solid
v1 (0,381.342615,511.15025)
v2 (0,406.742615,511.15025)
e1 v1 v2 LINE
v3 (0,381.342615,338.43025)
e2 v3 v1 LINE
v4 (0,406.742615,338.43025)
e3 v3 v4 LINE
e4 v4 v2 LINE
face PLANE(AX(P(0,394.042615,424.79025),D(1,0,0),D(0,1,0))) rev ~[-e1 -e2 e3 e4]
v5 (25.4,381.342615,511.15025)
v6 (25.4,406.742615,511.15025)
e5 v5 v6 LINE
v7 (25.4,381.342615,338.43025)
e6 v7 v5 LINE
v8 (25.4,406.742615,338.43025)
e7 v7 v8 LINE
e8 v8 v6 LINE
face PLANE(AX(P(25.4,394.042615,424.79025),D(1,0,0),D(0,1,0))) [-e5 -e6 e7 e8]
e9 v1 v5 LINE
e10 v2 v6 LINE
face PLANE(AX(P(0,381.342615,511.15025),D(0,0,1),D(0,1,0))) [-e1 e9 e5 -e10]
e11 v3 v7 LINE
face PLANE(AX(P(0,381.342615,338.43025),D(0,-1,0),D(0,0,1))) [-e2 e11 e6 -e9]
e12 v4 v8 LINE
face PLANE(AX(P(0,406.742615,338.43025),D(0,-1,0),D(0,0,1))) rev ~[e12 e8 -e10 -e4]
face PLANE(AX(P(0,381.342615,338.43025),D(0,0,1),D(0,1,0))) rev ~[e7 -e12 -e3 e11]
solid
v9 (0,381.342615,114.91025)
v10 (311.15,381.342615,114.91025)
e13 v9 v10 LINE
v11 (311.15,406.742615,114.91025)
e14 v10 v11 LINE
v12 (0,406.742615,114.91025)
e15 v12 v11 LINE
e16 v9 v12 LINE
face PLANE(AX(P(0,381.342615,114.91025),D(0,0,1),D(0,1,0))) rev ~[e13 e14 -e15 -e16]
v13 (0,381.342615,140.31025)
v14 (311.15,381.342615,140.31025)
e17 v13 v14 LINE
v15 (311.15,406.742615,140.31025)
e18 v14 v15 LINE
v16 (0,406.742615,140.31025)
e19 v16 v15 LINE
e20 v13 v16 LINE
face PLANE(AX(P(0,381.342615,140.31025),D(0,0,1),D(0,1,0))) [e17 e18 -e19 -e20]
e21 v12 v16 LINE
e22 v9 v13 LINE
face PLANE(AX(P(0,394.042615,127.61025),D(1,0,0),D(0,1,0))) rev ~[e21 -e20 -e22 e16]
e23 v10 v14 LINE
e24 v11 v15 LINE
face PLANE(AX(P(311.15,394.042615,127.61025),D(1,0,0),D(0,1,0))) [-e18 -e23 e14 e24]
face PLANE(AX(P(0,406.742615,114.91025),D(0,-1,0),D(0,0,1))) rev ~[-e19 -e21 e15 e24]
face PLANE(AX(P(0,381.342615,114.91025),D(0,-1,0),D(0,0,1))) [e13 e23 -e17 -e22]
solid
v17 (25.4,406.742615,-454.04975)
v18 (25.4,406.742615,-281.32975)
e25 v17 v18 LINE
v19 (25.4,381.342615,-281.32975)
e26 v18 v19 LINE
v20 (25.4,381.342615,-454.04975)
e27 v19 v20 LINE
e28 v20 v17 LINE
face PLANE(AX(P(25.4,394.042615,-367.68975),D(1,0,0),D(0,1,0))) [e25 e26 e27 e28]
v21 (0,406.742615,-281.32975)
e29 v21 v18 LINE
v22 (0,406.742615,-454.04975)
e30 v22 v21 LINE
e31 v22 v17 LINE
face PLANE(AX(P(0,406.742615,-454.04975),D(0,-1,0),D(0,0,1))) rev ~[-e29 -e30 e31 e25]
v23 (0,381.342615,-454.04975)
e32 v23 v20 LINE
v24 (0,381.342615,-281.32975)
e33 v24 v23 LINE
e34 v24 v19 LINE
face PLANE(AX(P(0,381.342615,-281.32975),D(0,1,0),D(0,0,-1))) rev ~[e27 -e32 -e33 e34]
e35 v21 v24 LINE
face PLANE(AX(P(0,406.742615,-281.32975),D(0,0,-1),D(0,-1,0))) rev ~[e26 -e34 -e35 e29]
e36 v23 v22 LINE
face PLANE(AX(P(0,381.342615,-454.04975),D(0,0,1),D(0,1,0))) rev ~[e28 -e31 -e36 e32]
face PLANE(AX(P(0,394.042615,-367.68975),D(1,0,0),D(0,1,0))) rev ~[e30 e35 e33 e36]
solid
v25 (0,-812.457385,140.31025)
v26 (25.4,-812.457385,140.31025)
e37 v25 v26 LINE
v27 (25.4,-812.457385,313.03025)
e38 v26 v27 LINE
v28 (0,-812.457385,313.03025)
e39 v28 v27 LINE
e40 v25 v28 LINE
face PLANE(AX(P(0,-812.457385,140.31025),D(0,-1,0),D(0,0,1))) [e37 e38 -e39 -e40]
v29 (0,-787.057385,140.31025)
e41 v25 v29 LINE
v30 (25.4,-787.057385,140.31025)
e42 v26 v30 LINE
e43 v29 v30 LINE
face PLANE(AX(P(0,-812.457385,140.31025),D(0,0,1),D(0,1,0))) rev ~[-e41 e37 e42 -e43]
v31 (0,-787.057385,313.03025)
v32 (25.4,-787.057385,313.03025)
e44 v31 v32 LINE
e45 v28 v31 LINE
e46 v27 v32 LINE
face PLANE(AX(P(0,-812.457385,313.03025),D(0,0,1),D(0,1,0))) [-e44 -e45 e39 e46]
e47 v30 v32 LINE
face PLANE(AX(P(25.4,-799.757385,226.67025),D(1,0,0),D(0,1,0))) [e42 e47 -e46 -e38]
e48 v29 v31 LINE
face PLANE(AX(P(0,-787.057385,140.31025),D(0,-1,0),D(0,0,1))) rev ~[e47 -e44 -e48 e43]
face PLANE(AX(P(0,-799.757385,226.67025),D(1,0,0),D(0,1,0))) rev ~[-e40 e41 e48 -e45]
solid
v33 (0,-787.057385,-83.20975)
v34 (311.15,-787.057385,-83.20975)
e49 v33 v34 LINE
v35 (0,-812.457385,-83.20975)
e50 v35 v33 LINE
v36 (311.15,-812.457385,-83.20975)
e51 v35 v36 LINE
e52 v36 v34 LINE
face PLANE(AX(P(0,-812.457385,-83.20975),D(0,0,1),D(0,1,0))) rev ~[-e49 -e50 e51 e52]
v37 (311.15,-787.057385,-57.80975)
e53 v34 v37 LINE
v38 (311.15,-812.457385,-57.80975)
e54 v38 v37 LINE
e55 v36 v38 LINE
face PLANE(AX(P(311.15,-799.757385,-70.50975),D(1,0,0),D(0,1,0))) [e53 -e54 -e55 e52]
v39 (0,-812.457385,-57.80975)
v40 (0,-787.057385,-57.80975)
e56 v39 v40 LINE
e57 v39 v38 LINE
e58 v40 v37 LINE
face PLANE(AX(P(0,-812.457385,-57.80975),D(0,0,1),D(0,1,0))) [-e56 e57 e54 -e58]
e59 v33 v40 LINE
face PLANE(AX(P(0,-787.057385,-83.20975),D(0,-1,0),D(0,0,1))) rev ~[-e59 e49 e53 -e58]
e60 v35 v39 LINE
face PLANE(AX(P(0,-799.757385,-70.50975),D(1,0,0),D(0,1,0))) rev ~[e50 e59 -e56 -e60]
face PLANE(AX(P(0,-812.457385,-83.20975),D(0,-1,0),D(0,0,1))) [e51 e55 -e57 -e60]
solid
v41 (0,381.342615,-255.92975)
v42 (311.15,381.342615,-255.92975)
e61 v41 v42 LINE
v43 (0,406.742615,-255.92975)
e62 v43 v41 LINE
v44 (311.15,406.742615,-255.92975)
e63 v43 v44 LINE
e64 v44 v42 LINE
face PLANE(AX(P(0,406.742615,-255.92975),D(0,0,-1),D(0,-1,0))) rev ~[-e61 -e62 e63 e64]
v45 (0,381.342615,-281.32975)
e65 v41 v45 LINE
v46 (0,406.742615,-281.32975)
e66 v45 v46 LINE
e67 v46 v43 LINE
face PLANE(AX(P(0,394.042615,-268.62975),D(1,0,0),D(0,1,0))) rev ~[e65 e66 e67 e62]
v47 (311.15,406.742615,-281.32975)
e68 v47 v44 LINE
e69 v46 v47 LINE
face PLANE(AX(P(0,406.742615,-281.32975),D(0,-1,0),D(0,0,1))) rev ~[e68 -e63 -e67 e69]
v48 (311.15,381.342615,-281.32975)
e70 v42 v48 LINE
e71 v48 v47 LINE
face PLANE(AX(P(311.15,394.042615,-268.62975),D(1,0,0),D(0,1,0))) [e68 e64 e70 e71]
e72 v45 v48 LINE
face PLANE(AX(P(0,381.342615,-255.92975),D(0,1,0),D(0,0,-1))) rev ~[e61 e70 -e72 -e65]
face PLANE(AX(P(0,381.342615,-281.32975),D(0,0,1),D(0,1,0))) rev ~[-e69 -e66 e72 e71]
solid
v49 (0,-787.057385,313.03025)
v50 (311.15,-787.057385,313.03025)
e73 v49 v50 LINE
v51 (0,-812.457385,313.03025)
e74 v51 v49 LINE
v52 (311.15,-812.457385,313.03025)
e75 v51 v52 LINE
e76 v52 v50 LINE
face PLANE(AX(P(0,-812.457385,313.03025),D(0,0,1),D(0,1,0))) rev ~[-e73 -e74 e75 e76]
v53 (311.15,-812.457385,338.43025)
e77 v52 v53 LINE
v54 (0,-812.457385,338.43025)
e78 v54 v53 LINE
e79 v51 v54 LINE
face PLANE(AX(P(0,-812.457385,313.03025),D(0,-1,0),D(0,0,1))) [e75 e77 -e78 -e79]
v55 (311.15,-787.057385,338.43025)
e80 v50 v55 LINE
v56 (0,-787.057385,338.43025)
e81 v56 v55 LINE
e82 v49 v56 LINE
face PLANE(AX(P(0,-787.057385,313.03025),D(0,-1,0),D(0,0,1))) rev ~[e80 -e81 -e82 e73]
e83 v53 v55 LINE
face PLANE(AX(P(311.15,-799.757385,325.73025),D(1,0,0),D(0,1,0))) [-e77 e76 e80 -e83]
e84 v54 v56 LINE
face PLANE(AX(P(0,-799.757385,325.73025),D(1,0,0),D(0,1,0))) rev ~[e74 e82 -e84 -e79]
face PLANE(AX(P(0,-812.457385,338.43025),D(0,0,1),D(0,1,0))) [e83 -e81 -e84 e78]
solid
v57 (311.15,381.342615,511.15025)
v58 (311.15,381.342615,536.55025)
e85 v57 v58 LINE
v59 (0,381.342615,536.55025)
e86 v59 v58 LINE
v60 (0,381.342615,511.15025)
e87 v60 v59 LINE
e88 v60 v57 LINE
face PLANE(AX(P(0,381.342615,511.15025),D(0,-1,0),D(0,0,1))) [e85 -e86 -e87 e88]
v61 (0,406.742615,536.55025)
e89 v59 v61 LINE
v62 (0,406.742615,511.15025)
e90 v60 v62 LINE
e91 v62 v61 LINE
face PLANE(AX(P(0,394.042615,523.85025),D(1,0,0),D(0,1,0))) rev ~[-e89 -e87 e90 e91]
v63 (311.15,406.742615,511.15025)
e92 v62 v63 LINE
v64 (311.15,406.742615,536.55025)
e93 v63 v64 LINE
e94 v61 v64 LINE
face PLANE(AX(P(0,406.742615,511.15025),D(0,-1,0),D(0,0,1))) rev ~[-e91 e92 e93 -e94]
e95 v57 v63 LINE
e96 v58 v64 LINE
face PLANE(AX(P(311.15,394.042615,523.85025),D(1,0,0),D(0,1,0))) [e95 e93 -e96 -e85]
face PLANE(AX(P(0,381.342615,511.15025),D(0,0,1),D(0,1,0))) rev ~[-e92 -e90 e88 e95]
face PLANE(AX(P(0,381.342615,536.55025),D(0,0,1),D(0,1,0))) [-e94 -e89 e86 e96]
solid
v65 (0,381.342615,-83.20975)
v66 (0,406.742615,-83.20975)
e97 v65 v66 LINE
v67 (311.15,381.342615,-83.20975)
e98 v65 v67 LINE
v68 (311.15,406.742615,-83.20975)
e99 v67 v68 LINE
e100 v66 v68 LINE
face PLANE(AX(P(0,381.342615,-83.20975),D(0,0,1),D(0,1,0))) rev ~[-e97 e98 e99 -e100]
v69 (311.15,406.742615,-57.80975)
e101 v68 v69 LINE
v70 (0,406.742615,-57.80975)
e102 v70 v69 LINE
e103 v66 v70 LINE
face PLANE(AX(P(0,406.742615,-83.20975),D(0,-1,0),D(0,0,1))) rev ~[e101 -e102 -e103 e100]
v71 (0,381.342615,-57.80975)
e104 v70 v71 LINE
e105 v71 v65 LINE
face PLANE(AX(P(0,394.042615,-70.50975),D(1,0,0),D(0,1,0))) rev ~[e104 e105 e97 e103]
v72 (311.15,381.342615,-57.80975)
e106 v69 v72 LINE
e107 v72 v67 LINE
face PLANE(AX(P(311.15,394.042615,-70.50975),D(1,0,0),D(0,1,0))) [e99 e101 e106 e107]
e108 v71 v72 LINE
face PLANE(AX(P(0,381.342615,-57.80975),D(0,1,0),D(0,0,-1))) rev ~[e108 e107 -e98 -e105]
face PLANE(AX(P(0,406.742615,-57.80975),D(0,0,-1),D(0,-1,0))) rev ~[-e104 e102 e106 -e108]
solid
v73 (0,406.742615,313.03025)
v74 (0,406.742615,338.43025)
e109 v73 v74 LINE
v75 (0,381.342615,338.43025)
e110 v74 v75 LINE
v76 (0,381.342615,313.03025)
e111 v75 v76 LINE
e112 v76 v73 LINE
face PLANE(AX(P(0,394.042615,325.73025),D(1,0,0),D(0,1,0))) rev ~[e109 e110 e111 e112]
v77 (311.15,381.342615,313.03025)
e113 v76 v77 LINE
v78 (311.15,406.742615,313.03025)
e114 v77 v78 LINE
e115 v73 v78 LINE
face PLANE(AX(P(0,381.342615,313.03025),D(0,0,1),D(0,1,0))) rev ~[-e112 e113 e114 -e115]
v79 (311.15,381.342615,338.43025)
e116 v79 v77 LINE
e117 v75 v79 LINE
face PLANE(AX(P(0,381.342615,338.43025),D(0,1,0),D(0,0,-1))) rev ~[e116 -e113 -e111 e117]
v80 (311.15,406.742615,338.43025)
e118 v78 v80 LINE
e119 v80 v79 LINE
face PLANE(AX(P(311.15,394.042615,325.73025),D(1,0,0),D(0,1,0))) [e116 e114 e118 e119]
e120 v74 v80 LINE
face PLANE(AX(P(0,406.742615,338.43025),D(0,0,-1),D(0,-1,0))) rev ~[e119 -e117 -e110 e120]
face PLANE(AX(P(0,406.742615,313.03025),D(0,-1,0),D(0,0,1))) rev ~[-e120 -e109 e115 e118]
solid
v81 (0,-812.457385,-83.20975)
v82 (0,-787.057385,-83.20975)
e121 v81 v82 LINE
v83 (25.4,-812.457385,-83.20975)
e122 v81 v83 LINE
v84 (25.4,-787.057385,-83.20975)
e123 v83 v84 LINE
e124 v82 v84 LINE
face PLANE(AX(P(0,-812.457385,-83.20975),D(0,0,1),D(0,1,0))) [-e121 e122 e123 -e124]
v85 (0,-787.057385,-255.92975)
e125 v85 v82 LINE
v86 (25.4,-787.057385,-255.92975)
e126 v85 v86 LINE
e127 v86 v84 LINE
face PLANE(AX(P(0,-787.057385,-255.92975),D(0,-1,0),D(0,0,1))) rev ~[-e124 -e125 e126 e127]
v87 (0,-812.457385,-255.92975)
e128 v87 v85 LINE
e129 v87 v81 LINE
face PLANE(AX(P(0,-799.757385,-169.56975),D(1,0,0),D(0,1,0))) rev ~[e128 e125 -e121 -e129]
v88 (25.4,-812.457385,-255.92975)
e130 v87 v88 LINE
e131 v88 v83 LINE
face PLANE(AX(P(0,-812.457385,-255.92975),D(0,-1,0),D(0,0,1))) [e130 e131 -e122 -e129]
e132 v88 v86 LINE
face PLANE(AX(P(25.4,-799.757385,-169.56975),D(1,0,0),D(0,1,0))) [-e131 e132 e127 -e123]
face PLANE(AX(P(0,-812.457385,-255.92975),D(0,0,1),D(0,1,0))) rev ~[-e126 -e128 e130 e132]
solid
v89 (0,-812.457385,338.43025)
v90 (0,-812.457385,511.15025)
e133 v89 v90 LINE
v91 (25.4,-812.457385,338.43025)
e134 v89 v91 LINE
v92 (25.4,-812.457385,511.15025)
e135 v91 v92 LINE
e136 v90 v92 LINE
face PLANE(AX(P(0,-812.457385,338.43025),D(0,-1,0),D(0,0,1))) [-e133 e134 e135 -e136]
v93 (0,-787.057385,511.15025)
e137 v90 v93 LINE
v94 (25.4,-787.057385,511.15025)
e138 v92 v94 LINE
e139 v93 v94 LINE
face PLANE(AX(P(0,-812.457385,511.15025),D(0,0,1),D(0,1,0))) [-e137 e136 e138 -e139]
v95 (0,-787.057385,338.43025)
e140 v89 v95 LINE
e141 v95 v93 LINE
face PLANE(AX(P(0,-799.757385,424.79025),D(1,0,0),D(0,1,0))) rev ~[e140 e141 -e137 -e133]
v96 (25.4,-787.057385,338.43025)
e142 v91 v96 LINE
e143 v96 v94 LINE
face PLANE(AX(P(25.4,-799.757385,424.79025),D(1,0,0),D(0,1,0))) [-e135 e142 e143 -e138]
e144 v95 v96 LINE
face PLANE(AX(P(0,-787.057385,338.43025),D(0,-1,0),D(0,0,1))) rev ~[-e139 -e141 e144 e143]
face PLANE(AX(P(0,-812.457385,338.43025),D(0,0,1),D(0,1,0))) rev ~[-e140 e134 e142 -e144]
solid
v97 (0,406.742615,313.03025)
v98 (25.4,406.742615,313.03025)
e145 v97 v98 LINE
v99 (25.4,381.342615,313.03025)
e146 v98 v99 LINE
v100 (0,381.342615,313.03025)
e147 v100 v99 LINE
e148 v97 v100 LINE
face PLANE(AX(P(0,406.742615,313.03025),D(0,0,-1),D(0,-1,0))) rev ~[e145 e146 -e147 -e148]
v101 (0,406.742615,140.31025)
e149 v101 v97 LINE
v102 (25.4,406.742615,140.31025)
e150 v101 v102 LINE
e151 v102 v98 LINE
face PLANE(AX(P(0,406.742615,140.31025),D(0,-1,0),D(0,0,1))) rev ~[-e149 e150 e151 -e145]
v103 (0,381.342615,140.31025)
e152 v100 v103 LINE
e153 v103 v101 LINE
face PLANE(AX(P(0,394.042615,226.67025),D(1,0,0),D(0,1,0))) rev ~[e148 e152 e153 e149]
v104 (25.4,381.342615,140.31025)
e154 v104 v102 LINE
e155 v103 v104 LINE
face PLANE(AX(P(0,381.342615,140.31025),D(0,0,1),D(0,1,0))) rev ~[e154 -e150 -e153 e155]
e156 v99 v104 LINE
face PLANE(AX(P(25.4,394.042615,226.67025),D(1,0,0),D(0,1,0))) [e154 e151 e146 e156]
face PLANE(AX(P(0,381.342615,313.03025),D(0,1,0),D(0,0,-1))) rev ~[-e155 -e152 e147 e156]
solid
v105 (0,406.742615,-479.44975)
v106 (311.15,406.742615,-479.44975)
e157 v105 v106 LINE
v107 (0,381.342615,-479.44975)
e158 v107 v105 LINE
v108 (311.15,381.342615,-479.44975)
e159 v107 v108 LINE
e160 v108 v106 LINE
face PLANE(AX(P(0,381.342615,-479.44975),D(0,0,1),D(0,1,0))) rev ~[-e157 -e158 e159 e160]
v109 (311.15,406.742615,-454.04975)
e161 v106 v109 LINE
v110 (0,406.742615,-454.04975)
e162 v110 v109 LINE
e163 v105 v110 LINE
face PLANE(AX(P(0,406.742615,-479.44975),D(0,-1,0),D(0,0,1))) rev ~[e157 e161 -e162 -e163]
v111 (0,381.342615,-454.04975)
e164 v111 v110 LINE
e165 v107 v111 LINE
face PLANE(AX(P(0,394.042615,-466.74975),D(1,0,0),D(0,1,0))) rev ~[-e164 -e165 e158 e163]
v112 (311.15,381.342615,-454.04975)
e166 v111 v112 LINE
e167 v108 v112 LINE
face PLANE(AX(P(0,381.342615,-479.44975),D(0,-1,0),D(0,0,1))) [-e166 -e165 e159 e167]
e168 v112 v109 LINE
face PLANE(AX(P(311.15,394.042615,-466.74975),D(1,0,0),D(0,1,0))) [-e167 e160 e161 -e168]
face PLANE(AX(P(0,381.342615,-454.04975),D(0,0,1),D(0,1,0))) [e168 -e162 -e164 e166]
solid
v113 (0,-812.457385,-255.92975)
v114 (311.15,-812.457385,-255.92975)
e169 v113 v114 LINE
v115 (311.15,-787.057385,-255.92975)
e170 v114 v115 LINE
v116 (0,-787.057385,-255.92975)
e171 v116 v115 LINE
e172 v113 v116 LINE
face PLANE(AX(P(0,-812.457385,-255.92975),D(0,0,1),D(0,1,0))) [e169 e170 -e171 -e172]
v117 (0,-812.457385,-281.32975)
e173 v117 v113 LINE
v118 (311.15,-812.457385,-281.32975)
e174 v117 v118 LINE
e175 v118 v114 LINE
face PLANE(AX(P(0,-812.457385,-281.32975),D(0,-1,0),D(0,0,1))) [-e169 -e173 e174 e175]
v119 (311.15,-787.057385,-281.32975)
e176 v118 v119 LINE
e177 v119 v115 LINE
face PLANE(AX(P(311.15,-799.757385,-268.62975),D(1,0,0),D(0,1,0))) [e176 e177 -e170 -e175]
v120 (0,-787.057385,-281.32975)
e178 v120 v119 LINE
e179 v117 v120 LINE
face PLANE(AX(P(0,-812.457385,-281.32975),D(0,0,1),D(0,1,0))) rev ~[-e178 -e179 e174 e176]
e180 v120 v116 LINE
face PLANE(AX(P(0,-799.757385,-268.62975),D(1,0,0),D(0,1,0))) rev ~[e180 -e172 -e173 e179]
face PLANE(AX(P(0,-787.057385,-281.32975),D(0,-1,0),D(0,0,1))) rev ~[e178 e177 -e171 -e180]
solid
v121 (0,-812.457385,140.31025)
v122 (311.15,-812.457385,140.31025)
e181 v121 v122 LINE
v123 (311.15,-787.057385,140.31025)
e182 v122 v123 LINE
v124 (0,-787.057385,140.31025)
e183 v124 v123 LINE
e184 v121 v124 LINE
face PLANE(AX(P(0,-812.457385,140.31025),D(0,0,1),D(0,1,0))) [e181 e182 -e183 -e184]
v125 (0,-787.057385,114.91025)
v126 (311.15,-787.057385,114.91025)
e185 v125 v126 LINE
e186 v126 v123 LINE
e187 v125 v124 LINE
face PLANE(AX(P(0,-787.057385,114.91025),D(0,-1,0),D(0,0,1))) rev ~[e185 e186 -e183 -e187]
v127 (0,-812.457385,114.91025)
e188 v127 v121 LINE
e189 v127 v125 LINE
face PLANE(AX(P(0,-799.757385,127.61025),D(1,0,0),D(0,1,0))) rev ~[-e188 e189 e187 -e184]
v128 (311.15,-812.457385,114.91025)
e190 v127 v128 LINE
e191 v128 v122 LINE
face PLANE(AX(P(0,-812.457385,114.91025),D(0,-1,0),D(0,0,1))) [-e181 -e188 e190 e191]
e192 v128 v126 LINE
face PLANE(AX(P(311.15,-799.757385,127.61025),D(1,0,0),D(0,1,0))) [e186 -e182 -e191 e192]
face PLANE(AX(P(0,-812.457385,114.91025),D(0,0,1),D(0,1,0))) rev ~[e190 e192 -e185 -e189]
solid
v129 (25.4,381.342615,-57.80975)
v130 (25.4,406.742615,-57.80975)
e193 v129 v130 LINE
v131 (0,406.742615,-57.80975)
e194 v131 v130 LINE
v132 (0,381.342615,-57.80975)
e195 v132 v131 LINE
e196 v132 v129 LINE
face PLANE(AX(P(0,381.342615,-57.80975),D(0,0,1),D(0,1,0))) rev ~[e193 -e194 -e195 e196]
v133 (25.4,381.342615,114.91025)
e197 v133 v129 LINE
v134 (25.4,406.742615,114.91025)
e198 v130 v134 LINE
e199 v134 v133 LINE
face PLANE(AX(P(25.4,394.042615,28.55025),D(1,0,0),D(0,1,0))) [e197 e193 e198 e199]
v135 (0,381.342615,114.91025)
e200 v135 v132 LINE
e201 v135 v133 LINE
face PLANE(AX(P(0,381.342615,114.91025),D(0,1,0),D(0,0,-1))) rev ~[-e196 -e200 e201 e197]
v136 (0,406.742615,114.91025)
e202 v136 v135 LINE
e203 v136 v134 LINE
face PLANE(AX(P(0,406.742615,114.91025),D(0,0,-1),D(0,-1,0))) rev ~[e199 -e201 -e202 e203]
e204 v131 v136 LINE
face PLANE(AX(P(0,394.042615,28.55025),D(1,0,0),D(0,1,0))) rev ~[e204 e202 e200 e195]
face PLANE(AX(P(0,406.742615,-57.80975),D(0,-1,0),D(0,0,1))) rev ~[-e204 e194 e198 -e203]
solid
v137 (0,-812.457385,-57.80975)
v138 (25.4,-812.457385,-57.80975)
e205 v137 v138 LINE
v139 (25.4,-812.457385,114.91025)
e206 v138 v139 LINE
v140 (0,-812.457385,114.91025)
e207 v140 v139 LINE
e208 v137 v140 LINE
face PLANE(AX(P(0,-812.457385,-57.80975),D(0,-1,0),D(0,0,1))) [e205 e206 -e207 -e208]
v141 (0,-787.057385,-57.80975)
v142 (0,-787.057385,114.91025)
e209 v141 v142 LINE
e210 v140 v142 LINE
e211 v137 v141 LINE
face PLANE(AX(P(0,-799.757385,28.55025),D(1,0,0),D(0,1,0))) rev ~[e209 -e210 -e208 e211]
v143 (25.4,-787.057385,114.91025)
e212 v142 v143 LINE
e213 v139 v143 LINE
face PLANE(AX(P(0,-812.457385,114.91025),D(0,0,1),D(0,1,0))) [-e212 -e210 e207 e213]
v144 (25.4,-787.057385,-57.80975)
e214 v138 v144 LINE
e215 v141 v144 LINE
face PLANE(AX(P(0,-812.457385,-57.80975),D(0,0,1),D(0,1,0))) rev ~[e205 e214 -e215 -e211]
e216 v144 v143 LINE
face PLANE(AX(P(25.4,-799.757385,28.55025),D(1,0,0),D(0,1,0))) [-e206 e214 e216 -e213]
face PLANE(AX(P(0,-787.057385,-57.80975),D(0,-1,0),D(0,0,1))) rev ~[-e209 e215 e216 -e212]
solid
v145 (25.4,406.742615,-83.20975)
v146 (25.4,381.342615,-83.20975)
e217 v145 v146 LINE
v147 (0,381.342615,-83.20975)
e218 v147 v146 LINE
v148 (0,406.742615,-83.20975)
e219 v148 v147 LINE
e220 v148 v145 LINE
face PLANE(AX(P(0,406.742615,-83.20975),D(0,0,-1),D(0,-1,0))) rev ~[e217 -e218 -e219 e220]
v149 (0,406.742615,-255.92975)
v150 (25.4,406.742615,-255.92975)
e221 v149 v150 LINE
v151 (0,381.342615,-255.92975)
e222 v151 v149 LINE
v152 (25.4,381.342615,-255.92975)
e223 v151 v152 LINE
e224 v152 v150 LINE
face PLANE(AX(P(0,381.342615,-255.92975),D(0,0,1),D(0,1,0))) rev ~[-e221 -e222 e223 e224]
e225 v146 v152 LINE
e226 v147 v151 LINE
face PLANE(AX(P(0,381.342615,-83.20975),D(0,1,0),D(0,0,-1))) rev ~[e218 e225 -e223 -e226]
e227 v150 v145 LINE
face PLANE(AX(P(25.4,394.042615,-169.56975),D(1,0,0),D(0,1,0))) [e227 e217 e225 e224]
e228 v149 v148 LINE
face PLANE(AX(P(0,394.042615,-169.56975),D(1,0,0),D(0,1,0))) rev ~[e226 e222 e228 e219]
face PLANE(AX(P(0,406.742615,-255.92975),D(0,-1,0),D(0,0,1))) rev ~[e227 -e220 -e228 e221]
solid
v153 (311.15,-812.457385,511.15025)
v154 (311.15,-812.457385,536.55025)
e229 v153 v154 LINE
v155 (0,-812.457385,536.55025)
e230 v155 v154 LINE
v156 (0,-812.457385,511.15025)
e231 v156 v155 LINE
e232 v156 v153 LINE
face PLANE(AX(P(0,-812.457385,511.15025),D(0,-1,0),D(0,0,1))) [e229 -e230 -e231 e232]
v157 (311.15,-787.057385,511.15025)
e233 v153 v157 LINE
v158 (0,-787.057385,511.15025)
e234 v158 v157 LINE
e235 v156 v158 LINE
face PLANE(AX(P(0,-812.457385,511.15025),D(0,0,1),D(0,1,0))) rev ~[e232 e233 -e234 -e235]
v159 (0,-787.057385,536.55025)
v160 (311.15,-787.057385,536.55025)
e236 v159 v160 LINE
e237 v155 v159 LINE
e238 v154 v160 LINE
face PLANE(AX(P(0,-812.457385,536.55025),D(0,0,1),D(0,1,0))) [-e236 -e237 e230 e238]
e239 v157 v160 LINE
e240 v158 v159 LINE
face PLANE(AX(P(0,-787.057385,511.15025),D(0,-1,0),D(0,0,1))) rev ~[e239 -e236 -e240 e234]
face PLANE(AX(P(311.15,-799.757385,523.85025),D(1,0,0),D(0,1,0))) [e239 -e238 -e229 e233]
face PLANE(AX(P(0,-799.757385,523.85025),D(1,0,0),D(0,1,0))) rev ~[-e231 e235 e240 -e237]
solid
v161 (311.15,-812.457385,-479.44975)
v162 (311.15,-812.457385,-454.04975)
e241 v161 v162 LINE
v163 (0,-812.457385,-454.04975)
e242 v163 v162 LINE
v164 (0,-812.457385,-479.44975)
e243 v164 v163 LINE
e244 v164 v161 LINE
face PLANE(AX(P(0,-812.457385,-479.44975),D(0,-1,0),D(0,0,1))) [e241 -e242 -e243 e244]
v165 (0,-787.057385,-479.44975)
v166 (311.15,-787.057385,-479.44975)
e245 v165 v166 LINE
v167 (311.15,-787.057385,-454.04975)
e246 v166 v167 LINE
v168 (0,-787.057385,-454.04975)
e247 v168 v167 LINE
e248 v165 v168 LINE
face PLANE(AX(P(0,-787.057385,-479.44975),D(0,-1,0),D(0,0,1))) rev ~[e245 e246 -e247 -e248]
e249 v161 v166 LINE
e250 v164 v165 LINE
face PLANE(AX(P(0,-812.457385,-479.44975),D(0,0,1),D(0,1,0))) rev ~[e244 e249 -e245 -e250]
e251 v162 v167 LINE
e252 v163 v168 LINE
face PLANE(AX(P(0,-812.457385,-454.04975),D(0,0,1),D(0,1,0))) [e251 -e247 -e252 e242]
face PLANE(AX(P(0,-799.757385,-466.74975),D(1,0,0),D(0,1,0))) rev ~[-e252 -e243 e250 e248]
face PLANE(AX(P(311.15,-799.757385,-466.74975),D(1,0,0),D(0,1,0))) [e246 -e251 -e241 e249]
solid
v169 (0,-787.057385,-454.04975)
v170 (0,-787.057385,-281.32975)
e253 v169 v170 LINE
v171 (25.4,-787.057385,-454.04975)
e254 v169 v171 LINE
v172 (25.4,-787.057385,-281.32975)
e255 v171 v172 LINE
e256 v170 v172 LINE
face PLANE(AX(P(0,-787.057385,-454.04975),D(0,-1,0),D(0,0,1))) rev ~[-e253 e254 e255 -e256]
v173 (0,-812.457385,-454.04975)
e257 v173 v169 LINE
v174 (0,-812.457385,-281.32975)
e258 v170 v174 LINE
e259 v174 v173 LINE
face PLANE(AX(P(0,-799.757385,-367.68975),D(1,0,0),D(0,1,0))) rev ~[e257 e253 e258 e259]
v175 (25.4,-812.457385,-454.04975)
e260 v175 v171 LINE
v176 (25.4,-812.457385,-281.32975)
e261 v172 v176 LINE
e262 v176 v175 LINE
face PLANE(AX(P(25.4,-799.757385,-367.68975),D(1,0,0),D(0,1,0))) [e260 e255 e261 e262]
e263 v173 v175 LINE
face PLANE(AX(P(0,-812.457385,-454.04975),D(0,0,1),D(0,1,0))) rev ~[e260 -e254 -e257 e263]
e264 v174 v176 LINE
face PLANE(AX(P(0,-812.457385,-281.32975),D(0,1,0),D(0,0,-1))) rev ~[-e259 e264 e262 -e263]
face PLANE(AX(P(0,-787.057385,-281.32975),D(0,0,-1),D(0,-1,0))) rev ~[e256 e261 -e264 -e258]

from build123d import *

# Parameters (mm, degrees)
F0_W     = 25.4
F0_H     = 25.4
F1_DEPTH = 311.15
F0_H_2   = 172.72
F2_DEPTH = 25.4
F3_DEPTH = 25.4
F4_DEPTH = 311.15


with BuildPart() as f1:
    # F0 (on Right) → F1 (new body)
    with BuildSketch(Plane.YZ):
        with Locations((-799.7573850555, 127.6102497262)):
            Rectangle(F0_W, F0_H)
    extrude(amount=F1_DEPTH)


with BuildPart() as f1b:
    # F0 (on Right) → F1, piece 2 (new body)
    with BuildSketch(Plane.YZ):
        with Locations((-799.7573850555, -466.7497502738)):
            Rectangle(F0_W, F0_H)
    extrude(amount=F1_DEPTH)


with BuildPart() as f1c:
    # F0 (on Right) → F1, piece 3 (new body)
    with BuildSketch(Plane.YZ):
        with Locations((-799.7573850555, 325.7302497262)):
            Rectangle(F0_W, F0_H)
    extrude(amount=F1_DEPTH)


with BuildPart() as f1d:
    # F0 (on Right) → F1, piece 4 (new body)
    with BuildSketch(Plane.YZ):
        with Locations((-799.7573850555, -268.6297502738)):
            Rectangle(F0_W, F0_H)
    extrude(amount=F1_DEPTH)


with BuildPart() as f1e:
    # F0 (on Right) → F1, piece 5 (new body)
    with BuildSketch(Plane.YZ):
        with Locations((-799.7573850555, -70.5097502738)):
            Rectangle(F0_W, F0_H)
    extrude(amount=F1_DEPTH)


with BuildPart() as f1f:
    # F0 (on Right) → F1, piece 6 (new body)
    with BuildSketch(Plane.YZ):
        with Locations((-799.7573850555, 523.8502497262)):
            Rectangle(F0_W, F0_H)
    extrude(amount=F1_DEPTH)


with BuildPart() as f2:
    # F0 (on Right) → F2 (new body)
    with BuildSketch(Plane.YZ):
        with Locations((-799.7573850555, -169.5697502738)):
            Rectangle(F0_W, F0_H_2)
    extrude(amount=F2_DEPTH)


with BuildPart() as f2b:
    # F0 (on Right) → F2, piece 2 (new body)
    with BuildSketch(Plane.YZ):
        with Locations((-799.7573850555, 226.6702497262)):
            Rectangle(F0_W, F0_H_2)
    extrude(amount=F2_DEPTH)


with BuildPart() as f2c:
    # F0 (on Right) → F2, piece 3 (new body)
    with BuildSketch(Plane.YZ):
        with Locations((-799.7573850555, 424.7902497262)):
            Rectangle(F0_W, F0_H_2)
    extrude(amount=F2_DEPTH)


with BuildPart() as f2d:
    # F0 (on Right) → F2, piece 4 (new body)
    with BuildSketch(Plane.YZ):
        with Locations((-799.7573850555, 28.5502497262)):
            Rectangle(F0_W, F0_H_2)
    extrude(amount=F2_DEPTH)


with BuildPart() as f2e:
    # F0 (on Right) → F2, piece 5 (new body)
    with BuildSketch(Plane.YZ):
        Polygon((-812.4573850555, -454.0497502738), (-787.0573850555, -454.0497502738), (-787.0573850555, -296.3315248489), (-787.0573850555, -281.3297502738), (-812.4573850555, -281.3297502738), (-812.4573850555, -296.3315248489), align=None)
    extrude(amount=F2_DEPTH)


with BuildPart() as f3:
    # F0 (on Right) → F3 (new body)
    with BuildSketch(Plane.YZ):
        Polygon((381.3426149445, -57.8097502738), (406.7426149445, -57.8097502738), (406.7426149445, 100.4313870019), (406.7426149445, 114.9102497262), (381.3426149445, 114.9102497262), align=None)
    extrude(amount=F3_DEPTH)


with BuildPart() as f3b:
    # F0 (on Right) → F3, piece 2 (new body)
    with BuildSketch(Plane.YZ):
        Polygon((381.3426149445, -255.9297502738), (406.7426149445, -255.9297502738), (406.7426149445, -83.2097502738), (393.4404167575, -83.2097502738), (381.3426149445, -83.2097502738), align=None)
    extrude(amount=F3_DEPTH)


with BuildPart() as f3c:
    # F0 (on Right) → F3, piece 3 (new body)
    with BuildSketch(Plane.YZ):
        with Locations((394.0426149445, 424.7902497262)):
            Rectangle(F0_W, F0_H_2)
    extrude(amount=F3_DEPTH)


with BuildPart() as f3d:
    # F0 (on Right) → F3, piece 4 (new body)
    with BuildSketch(Plane.YZ):
        Polygon((381.3426149445, -454.0497502738), (406.7426149445, -454.0497502738), (406.7426149445, -281.3297502738), (381.8395647449, -281.3297502738), (381.3426149445, -281.3297502738), align=None)
    extrude(amount=F3_DEPTH)


with BuildPart() as f3e:
    # F0 (on Right) → F3, piece 5 (new body)
    with BuildSketch(Plane.YZ):
        Polygon((381.3426149445, 140.3102497262), (406.7426149445, 140.3102497262), (406.7426149445, 313.0302497262), (395.5076758461, 313.0302497262), (381.3426149445, 313.0302497262), align=None)
    extrude(amount=F3_DEPTH)


with BuildPart() as f4:
    # F0 (on Right) → F4 (new body)
    with BuildSketch(Plane.YZ):
        Polygon((395.5076758461, 313.0302497262), (406.7426149445, 313.0302497262), (406.7426149445, 338.4302497262), (381.3426149445, 338.4302497262), (381.3426149445, 313.0302497262), align=None)
    extrude(amount=F4_DEPTH)


with BuildPart() as f4b:
    # F0 (on Right) → F4, piece 2 (new body)
    with BuildSketch(Plane.YZ):
        with Locations((394.0426149445, 523.8502497262)):
            Rectangle(F0_W, F0_H)
    extrude(amount=F4_DEPTH)


with BuildPart() as f4c:
    # F0 (on Right) → F4, piece 3 (new body)
    with BuildSketch(Plane.YZ):
        with Locations((394.0426149445, -466.7497502738)):
            Rectangle(F0_W, F0_H)
    extrude(amount=F4_DEPTH)


with BuildPart() as f4d:
    # F0 (on Right) → F4, piece 4 (new body)
    with BuildSketch(Plane.YZ):
        Polygon((381.8395647449, -281.3297502738), (406.7426149445, -281.3297502738), (406.7426149445, -255.9297502738), (381.3426149445, -255.9297502738), (381.3426149445, -281.3297502738), align=None)
    extrude(amount=F4_DEPTH)


with BuildPart() as f4e:
    # F0 (on Right) → F4, piece 5 (new body)
    with BuildSketch(Plane.YZ):
        with Locations((394.0426149445, 127.6102497262)):
            Rectangle(F0_W, F0_H)
    extrude(amount=F4_DEPTH)


with BuildPart() as f4f:
    # F0 (on Right) → F4, piece 6 (new body)
    with BuildSketch(Plane.YZ):
        Polygon((393.4404167575, -83.2097502738), (406.7426149445, -83.2097502738), (406.7426149445, -57.8097502738), (381.3426149445, -57.8097502738), (381.3426149445, -83.2097502738), align=None)
    extrude(amount=F4_DEPTH)


solid = Compound([f1.part, f1b.part, f1c.part, f1d.part, f1e.part, f1f.part, f2.part, f2b.part, f2c.part, f2d.part, f2e.part, f3.part, f3b.part, f3c.part, f3d.part, f3e.part, f4.part, f4b.part, f4c.part, f4d.part, f4e.part, f4f.part])
